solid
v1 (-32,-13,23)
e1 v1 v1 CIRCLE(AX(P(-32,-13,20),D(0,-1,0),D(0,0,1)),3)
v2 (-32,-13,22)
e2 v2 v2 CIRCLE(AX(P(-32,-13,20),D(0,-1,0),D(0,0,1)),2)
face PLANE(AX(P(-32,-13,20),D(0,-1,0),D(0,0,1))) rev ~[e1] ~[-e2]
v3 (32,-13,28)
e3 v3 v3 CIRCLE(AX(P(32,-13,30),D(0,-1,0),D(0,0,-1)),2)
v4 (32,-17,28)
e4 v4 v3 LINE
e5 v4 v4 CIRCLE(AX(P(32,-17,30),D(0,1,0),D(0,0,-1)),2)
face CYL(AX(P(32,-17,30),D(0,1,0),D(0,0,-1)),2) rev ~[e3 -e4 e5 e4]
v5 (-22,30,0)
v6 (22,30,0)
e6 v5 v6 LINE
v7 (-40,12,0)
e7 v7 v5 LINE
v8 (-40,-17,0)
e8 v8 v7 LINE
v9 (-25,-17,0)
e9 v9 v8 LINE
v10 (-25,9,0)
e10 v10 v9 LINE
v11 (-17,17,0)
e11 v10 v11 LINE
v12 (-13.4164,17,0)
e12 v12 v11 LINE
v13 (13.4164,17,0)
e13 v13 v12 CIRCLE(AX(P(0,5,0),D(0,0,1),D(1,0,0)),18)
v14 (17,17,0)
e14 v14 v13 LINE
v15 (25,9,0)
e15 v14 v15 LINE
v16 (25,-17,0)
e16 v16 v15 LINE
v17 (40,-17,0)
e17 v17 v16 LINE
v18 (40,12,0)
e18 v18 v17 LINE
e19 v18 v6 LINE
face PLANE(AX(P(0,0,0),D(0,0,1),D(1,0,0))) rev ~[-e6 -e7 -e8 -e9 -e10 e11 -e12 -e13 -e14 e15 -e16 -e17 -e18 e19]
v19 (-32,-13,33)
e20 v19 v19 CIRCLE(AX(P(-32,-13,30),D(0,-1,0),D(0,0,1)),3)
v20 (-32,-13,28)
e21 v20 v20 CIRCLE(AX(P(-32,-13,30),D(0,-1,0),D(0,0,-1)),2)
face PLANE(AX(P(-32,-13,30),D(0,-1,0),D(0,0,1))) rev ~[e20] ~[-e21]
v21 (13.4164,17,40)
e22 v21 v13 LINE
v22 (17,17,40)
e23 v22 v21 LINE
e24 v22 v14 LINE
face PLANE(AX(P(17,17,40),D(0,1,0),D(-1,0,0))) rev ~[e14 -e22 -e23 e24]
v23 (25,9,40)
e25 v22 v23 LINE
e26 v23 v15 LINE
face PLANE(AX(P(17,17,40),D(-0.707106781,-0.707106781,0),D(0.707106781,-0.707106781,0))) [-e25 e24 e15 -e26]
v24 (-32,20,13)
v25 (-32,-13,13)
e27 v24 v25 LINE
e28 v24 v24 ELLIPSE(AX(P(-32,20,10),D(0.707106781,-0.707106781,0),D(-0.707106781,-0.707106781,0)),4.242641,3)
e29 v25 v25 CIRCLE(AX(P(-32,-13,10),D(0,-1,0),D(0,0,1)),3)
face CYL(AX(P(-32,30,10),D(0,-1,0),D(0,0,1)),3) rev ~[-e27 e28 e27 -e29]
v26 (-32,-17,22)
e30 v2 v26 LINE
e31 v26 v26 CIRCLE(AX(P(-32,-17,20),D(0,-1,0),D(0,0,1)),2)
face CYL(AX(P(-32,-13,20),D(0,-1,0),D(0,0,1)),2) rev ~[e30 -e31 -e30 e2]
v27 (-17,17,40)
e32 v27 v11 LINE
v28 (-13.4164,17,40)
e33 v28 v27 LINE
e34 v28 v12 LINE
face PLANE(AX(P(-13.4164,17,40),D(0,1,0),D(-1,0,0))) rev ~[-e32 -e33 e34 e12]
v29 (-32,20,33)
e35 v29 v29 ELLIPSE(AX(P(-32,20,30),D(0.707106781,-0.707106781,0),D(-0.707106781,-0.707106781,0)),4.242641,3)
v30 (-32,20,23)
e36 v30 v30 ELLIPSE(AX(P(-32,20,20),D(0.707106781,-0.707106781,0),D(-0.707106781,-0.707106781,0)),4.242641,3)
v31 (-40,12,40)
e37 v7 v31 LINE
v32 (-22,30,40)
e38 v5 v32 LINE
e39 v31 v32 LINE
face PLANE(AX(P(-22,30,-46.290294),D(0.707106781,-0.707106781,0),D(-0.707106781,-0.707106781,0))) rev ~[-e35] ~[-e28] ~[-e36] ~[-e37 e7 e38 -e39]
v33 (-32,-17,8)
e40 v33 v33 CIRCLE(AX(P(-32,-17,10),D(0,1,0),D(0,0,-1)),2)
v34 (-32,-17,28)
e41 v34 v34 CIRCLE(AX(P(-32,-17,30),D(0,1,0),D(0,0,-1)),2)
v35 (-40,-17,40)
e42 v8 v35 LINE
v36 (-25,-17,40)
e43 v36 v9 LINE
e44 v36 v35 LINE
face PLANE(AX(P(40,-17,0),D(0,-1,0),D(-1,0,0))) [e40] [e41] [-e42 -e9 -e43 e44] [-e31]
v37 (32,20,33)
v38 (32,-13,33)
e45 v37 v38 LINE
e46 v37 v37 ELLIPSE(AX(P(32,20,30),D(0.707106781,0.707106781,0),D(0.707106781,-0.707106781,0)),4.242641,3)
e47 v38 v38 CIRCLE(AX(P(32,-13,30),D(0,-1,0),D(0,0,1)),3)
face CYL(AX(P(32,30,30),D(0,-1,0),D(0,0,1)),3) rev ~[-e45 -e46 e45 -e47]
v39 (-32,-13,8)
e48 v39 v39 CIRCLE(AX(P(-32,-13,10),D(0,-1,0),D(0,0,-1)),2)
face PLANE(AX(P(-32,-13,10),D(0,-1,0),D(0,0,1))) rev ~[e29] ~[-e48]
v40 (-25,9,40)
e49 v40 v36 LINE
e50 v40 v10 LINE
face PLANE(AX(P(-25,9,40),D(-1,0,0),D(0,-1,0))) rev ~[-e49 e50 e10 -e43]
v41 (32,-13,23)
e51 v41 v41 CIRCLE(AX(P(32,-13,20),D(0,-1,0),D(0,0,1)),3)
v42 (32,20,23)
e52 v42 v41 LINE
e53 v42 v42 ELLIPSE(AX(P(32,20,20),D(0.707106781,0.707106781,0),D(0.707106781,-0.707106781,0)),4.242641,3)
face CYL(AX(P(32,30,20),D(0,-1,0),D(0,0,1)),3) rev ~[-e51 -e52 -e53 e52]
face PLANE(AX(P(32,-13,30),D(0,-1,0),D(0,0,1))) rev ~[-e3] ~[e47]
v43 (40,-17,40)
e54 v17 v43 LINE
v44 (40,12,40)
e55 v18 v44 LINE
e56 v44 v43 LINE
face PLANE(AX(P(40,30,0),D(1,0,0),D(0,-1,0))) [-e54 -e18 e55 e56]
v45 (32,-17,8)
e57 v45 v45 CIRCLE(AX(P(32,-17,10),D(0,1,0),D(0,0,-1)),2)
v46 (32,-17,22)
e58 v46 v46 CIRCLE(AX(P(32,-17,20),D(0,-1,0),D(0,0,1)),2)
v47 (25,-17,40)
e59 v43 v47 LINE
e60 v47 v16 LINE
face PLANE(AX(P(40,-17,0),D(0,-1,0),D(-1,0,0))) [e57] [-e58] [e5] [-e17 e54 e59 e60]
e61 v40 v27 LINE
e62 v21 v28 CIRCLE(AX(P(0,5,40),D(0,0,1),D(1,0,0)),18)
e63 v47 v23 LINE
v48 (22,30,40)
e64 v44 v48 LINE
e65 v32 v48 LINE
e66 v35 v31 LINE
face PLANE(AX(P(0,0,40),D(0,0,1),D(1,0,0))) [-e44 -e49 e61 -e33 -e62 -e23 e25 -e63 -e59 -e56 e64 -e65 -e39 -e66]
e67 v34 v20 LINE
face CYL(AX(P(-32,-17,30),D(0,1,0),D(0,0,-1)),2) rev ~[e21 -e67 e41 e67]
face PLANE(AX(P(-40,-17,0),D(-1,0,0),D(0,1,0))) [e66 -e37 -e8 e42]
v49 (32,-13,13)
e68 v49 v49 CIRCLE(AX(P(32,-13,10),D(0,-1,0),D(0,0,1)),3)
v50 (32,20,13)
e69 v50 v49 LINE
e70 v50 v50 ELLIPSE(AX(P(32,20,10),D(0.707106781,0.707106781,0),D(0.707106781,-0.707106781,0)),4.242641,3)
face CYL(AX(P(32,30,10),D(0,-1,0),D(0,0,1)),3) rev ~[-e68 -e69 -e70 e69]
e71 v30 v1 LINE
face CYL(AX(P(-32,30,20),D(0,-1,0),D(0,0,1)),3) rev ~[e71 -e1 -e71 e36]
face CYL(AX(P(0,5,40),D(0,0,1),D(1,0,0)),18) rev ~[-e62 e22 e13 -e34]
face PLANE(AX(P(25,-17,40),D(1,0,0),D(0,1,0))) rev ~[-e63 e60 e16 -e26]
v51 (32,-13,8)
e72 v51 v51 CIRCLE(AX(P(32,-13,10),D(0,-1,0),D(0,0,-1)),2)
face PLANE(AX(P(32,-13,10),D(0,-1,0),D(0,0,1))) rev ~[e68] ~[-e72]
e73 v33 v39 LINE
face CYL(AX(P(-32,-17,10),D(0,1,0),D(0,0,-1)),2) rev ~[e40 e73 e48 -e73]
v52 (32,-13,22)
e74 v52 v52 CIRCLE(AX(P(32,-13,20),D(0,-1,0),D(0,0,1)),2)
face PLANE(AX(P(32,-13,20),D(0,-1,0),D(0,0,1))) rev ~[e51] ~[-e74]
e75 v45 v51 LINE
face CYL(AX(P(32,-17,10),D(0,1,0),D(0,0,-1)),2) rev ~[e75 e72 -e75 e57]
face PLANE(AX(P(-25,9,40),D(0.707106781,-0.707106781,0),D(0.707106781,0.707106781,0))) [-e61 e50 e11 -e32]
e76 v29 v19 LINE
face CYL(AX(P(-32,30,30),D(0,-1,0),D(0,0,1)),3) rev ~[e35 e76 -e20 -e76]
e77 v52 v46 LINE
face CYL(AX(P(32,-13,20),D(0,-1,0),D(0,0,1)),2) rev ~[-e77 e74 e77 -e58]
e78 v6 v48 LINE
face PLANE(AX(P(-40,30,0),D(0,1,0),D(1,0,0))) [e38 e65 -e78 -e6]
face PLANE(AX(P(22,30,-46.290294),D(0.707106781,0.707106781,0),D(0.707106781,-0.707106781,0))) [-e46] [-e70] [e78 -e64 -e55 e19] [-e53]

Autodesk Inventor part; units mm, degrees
ref_plane "YZ Plane" through (0, 0, 0) normal (1, 0, 0) x (0, 1, 0)
ref_plane "XZ Plane" through (0, 0, 0) normal (0, 1, 0) x (-1, 0, 0)
ref_plane "XY Plane" through (0, 0, 0) normal (0, 0, 1) x (1, 0, 0)
sketch "Esquisse1" plane through (0, 0, 0) normal (0, 0, 1) x (1, 0, 0)
  line L0 (-40, 30) -> (40, 30)
  line L1 (40, 30) -> (40, -17)
  line L2 (40, -17) -> (-40, -17)
  line L3 (-40, -17) -> (-40, 30)
  point P0 (0, 0)
  dimension "d0" = 47
  dimension "d1" = 80
  dimension "d2" = 40
  dimension "d3" = 30
extrude "Extrusion1" add sketch "Esquisse1" along normal blind 40
sketch "Esquisse2" plane through (0, 0, 40) normal (0, 0, 1) x (1, 0, 0)
  circle A0 centre (0, 5) radius 18
  line L0 (40, -17) -> (40, 30) projected
  line L1 (-40, 30) -> (40, 30) projected
  point P0 (0, 0)
  dimension "d6" = 36
  dimension "d7" = 40
  dimension "d8" = 25
extrude "Extrusion2" cut sketch "Esquisse2" against normal blind 40
sketch "Esquisse3" plane through (0, 0, 40) normal (0, 0, 1) x (1, 0, 0)
  circle A0 centre (0, 5) radius 18 projected
  line L0 (40, -17) -> (-40, -17) projected
  line L1 (-25, -17) -> (25, -17)
  line L2 (25, -17) -> (25, 9)
  line L3 (-25, 9) -> (-25, -17)
  line L4 (-25, 9) -> (-17, 17)
  line L5 (17, 17) -> (25, 9)
  line L6 (17, 17) -> (13.4164, 17)
  line L7 (-13.4164, 17) -> (-17, 17)
  point P0 (0, 0)
  point P1 (25, 17)
  point P2 (-25, 17)
extrude "Extrusion3" cut sketch "Esquisse3" against normal blind 40
sketch "Esquisse4" plane through (-40, -17, 0) normal (0, -1, 0) x (1, 0, 0)
  line L0 (8, 10) -> (72, 10)
  line L1 (72, 10) -> (72, 30)
  line L2 (72, 30) -> (8, 30)
  line L3 (8, 30) -> (8, 10)
  line L4 (0, 40) -> (80, 40) projected
  line L5 (80, 0) -> (0, 0) projected
  point P0 (40, 0)
  point P1 (15, 40)
  point P2 (65, 0)
  dimension "d23" = 64
  dimension "d24" = 32
  dimension "d25" = 10
  dimension "d26" = 10
hole "Perçage1" at (-32, -17, 30) at (32, -17, 30) at (32, -17, 10) at (-32, -17, 10) direction (0, 1, 0) diameter 4 depth 100 tip angle 118
sketch "Esquisse5" plane through (-40, 30, 0) normal (0, 1, 0) x (1, 0, 0)
  circle A0 centre (72, -30) radius 2 projected
  line L0 (8, -10) -> (72, -10)
  line L1 (72, -10) -> (72, -30)
  line L2 (72, -30) -> (8, -30)
  line L3 (8, -30) -> (8, -10)
  circle A1 centre (8, -10) radius 2 projected
  line L4 (8, -20) -> (72, -20)
  point P0 (40, 0)
hole "Perçage2" at (-32, 30, 10) at (-32, 30, 20) at (-32, 30, 30) at (32, 30, 30) at (32, 30, 20) at (32, 30, 10) direction (0, -1, 0) diameter 4 depth 100 tip angle 118 counterbore diameter 6 counterbore depth 43
chamfer "Chanfrein2" distance 18 distance2 18 1 edges at (40, 30, 20)
chamfer "Chanfrein3" distance 18 distance2 18 1 edges at (-40, 30, 20)
properties part number "Soutient_Mot"
